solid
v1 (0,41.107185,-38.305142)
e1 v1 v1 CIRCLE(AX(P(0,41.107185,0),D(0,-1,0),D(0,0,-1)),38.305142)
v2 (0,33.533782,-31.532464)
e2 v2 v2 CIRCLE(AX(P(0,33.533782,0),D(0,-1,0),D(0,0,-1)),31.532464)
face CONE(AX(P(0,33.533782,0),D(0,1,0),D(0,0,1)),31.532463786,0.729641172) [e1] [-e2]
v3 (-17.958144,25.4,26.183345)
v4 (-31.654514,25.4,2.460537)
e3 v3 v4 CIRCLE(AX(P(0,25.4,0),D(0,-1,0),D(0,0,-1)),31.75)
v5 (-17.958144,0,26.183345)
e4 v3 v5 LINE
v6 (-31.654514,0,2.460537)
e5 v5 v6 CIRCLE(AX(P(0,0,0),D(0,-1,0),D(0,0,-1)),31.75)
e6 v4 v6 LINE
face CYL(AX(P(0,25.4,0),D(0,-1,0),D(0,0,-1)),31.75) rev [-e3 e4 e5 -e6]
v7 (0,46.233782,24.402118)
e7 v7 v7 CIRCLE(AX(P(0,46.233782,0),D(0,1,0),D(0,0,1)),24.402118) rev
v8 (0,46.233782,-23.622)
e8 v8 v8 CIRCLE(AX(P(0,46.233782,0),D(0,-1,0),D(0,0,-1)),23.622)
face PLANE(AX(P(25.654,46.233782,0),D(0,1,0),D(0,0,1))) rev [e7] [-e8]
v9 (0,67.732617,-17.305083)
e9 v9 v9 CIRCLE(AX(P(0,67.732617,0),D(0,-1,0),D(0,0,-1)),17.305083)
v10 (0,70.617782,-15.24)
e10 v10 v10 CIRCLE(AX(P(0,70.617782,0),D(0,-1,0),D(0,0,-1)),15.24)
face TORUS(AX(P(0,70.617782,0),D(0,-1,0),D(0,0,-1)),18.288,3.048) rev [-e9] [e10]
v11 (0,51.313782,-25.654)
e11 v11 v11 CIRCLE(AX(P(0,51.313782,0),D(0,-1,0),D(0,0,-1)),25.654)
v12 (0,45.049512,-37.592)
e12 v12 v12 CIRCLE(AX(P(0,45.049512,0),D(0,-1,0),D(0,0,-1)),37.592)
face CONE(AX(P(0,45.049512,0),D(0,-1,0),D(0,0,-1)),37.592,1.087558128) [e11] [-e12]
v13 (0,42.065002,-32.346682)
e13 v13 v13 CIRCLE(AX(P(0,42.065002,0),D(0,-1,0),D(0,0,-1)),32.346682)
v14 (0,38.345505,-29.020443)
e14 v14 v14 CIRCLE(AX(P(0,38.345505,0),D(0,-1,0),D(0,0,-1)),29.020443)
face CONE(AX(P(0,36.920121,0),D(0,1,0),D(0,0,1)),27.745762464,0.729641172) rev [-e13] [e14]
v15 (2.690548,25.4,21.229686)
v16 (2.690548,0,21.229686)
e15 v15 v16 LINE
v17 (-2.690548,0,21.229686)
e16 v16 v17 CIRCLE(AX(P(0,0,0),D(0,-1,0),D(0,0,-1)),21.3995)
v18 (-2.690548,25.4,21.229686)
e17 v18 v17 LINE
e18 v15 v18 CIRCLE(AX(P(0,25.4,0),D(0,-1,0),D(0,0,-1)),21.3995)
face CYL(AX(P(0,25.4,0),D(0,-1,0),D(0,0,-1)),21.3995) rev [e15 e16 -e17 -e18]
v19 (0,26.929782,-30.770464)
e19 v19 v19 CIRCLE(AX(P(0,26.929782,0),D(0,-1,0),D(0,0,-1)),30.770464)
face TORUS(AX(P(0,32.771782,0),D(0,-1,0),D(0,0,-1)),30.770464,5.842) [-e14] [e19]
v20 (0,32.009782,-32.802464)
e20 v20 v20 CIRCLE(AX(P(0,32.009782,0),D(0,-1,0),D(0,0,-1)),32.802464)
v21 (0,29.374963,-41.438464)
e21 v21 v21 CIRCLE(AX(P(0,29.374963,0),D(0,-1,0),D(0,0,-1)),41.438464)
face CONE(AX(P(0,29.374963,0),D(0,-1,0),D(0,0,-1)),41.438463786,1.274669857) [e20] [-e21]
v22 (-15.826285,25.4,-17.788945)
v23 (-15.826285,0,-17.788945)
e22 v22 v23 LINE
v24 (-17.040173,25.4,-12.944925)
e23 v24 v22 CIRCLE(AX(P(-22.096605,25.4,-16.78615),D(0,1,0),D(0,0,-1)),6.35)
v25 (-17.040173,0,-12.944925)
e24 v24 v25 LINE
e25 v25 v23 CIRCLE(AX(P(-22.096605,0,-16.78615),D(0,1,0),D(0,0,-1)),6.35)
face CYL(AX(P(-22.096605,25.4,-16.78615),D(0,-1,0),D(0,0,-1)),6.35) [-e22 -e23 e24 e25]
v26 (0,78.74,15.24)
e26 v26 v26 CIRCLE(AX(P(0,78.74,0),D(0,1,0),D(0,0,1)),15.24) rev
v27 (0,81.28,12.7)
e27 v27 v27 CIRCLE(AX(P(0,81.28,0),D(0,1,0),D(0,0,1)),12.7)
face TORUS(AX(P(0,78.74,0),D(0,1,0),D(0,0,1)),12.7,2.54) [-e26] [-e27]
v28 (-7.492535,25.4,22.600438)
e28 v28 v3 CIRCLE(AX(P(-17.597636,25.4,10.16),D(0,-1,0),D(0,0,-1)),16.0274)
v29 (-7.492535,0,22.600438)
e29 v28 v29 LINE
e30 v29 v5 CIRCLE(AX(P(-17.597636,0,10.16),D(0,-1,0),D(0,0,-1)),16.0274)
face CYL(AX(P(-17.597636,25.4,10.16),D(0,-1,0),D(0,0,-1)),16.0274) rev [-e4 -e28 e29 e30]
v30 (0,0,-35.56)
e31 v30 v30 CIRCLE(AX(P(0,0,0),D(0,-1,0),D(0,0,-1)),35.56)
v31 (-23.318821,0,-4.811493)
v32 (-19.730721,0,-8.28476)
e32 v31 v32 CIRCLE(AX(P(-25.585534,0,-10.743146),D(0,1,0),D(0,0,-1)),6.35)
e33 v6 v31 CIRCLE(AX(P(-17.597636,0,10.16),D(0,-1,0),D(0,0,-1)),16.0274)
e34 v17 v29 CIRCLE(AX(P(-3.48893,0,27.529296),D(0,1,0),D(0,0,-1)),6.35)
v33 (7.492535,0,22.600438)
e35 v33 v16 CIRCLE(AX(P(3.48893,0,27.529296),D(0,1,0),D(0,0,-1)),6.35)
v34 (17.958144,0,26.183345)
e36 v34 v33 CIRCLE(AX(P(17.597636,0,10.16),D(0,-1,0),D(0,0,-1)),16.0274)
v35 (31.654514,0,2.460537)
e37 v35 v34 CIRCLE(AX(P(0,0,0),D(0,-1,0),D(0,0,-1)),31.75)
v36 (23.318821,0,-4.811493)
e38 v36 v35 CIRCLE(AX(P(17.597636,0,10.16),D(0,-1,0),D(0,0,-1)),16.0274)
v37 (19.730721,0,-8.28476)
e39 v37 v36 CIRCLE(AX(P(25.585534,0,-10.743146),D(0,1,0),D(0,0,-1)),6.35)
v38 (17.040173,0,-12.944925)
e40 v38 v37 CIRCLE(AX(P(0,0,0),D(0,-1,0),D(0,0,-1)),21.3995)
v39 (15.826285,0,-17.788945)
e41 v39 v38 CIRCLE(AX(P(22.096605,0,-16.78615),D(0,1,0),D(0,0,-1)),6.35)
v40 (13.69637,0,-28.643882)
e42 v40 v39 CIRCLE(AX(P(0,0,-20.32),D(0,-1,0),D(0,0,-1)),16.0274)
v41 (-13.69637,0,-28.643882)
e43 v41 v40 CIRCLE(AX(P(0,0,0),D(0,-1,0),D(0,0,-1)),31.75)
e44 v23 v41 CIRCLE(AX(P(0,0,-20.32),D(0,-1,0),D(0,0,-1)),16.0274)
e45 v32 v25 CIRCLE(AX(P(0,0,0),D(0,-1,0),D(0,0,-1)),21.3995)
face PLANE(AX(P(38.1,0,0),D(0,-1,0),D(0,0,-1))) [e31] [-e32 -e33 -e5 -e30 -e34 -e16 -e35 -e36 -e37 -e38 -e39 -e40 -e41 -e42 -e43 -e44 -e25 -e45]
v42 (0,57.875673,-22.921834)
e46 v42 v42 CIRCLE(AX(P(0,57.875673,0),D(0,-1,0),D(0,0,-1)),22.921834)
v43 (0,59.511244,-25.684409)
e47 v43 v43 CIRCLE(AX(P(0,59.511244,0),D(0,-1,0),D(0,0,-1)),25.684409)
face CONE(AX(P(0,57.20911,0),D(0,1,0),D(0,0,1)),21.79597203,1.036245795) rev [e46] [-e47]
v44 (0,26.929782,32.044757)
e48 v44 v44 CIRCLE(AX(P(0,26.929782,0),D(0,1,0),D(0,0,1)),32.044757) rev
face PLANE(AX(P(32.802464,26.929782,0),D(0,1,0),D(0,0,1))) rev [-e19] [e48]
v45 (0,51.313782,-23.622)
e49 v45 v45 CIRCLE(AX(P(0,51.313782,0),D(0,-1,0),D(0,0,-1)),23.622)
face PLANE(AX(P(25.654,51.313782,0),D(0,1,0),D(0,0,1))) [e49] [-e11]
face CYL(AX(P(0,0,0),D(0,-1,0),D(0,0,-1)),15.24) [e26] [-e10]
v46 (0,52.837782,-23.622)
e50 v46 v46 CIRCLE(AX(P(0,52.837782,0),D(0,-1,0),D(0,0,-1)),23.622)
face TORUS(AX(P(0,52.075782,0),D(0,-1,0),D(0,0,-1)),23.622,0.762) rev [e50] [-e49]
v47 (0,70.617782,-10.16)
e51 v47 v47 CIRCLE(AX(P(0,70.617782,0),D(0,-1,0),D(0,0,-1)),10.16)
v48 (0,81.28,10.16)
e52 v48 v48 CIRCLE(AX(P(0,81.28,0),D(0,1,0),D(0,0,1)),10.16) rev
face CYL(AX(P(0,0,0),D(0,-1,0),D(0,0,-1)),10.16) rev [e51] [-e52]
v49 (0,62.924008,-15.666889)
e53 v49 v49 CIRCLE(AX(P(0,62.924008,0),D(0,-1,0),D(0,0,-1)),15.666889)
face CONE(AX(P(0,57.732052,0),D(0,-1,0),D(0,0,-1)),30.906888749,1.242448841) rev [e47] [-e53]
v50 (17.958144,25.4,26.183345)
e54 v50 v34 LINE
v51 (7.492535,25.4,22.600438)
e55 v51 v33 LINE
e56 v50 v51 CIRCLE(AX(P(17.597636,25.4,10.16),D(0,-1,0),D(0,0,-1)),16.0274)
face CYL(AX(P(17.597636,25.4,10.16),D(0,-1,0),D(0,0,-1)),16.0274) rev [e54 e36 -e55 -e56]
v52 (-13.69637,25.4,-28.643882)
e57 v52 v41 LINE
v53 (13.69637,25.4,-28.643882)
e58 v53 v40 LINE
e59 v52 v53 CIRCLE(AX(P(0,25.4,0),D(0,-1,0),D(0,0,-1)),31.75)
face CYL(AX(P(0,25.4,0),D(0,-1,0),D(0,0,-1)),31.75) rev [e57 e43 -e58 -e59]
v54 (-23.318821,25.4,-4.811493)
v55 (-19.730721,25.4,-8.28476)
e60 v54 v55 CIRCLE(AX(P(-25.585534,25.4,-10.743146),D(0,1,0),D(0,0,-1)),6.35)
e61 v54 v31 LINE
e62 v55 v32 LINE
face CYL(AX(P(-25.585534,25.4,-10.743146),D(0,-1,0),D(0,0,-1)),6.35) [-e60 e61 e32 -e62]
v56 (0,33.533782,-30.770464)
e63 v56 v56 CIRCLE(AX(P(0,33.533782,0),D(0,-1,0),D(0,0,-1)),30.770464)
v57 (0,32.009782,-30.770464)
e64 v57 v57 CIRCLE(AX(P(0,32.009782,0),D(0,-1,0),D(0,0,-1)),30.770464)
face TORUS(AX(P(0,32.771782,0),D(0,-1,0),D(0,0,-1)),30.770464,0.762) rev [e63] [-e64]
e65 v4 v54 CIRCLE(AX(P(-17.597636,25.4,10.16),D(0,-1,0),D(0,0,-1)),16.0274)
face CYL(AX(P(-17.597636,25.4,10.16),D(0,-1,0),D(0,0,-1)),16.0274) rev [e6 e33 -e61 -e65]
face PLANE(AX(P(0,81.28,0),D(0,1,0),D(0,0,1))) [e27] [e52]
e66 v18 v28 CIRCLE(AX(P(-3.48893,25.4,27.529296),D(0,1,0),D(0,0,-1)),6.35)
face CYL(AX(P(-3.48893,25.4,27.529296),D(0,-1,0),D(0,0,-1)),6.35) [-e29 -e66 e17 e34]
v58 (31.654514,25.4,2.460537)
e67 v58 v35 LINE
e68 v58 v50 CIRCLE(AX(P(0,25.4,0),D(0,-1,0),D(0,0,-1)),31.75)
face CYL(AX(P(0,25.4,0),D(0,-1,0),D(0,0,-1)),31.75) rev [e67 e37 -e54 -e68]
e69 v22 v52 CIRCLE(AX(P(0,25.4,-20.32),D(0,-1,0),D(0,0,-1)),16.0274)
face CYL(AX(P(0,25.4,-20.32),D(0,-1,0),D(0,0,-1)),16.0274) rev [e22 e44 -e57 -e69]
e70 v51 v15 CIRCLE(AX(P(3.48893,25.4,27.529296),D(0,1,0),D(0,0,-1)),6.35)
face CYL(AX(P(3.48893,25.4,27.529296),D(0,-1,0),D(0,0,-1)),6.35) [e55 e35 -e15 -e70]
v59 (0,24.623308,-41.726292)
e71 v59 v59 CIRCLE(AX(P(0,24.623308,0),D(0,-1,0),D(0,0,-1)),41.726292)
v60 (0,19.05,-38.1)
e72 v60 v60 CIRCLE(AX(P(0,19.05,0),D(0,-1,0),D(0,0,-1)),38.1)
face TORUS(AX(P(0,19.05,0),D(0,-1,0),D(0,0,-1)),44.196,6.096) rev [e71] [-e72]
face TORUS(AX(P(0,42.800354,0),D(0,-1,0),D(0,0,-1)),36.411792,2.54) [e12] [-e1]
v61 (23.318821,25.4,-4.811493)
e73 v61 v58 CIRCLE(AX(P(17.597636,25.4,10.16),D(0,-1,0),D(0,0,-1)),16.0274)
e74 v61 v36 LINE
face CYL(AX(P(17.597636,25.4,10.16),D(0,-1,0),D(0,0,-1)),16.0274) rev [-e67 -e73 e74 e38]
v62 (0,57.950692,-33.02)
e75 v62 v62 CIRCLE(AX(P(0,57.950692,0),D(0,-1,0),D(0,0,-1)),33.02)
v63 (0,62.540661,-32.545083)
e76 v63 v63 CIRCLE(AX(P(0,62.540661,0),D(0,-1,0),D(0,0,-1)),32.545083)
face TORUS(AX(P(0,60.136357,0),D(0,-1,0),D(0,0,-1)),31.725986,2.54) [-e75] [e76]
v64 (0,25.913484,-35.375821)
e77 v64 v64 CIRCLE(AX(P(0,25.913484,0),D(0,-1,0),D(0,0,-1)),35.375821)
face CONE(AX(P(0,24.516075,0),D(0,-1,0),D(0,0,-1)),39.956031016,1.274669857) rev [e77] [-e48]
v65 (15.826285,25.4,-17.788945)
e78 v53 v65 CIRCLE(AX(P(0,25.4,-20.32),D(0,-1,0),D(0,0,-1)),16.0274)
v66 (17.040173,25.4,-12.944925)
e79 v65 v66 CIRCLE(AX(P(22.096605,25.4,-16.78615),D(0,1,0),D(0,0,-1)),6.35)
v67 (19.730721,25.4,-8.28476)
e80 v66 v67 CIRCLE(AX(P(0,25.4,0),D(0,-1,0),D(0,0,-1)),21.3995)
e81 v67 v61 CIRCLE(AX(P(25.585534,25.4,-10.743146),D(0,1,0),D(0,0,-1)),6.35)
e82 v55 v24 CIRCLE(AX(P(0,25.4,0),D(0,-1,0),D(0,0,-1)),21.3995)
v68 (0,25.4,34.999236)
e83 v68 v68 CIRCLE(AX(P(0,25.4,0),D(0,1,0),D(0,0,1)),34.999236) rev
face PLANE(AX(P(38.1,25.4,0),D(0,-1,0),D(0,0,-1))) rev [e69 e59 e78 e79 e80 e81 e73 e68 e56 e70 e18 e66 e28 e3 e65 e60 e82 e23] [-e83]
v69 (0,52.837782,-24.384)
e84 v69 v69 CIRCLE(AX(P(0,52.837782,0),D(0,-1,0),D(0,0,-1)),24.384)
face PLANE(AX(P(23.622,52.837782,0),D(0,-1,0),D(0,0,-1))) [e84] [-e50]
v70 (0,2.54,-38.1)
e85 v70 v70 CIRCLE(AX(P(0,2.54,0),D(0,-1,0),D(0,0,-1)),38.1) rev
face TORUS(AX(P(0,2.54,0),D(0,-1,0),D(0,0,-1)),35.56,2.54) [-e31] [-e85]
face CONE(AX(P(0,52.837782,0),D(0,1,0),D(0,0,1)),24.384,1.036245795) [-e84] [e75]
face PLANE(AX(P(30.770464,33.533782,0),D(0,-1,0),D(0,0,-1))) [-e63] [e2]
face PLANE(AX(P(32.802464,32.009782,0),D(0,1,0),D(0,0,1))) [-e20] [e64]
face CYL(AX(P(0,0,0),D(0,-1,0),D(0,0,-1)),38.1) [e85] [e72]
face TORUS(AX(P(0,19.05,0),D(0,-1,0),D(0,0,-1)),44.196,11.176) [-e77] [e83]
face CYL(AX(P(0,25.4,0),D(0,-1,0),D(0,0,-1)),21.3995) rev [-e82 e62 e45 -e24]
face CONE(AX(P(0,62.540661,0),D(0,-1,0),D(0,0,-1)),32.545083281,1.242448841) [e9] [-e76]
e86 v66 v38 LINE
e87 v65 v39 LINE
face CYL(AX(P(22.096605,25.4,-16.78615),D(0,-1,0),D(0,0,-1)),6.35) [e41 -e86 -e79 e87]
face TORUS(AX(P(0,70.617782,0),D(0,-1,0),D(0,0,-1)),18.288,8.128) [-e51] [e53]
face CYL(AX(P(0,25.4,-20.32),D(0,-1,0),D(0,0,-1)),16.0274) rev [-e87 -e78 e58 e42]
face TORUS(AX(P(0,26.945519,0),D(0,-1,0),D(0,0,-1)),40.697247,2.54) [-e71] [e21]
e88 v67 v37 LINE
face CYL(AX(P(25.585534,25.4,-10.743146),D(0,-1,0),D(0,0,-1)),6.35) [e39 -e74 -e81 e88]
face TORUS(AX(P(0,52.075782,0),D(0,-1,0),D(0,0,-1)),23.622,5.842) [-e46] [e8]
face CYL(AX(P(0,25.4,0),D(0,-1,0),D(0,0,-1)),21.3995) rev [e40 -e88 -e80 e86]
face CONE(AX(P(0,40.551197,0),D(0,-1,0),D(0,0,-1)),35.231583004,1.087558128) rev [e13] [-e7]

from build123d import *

# Parameters (mm, degrees)
CUT_EXTRUDE6_DEPTH = 25.4
FILLET2_R          = 2.54


# Read off the part's stored shape, not the designer's step: Shell5
with BuildPart() as part:
    # Sketch1 → Revolve1 (revolve)
    with BuildSketch(Plane.XY, mode=Mode.PRIVATE) as revolve1_sk:
        with BuildLine():
            Line((0, 0), (0, 81.28))
            Line((0, 81.28), (15.24, 81.28))
            Line((15.24, 81.28), (15.24, 70.617782167))
            ThreePointArc((15.24, 70.617782167), (15.809468766, 68.843750905), (17.305083281, 67.732616882))
            Line((17.305083281, 67.732616882), (32.545083281, 62.540661026))
            ThreePointArc((32.545083281, 62.540661026), (34.252497966, 60.397770779), (33.02, 57.950692464))
            Line((33.02, 57.950692464), (24.384, 52.837782167))
            Line((24.384, 52.837782167), (23.622, 52.837782167))
            ThreePointArc((23.622, 52.837782167), (22.86, 52.075782167), (23.622, 51.313782167))
            Line((23.622, 51.313782167), (25.654, 51.313782167))
            Line((25.654, 51.313782167), (37.592, 45.049511558))
            ThreePointArc((37.592, 45.049511558), (38.911226743, 43.252486551), (38.305142163, 41.107184811))
            Line((38.305142163, 41.107184811), (31.532463786, 33.533782167))
            Line((31.532463786, 33.533782167), (30.770463786, 33.533782167))
            ThreePointArc((30.770463786, 33.533782167), (30.008463786, 32.771782167), (30.770463786, 32.009782167))
            Line((30.770463786, 32.009782167), (32.802463786, 32.009782167))
            Line((32.802463786, 32.009782167), (41.438463786, 29.374963403))
            ThreePointArc((41.438463786, 29.374963403), (43.232600234, 27.099096753), (41.726292283, 24.623307796))
            ThreePointArc((41.726292283, 24.623307796), (39.086374072, 22.374596047), (38.1, 19.05))
            Line((38.1, 19.05), (38.1, 0))
            Line((38.1, 0), (0, 0))
        make_face()
    revolve(revolve1_sk.sketch.rotate(Axis((0, 0, 0), (0, 1, 0)), 90), axis=Axis((0, 0, 0), (0, 1, 0)))

    # Shell5 outline → Shell5 (revolve, cut)
    with BuildSketch(Plane.XY):
        with BuildLine():
            Line((0, 81.28), (0, 25.4))
            Line((0, 25.4), (34.999235569, 25.4))
            ThreePointArc((34.999235569, 25.4), (35.18387039, 25.659424777), (35.375820896, 25.913484288))
            Line((35.375820896, 25.913484288), (32.044757447, 26.929782167))
            Line((32.044757447, 26.929782167), (30.770463786, 26.929782167))
            ThreePointArc((30.770463786, 26.929782167), (24.995922457, 31.886549747), (29.020442836, 38.345505399))
            Line((29.020442836, 38.345505399), (32.346682487, 42.065001701))
            Line((32.346682487, 42.065001701), (24.402118097, 46.233782167))
            Line((24.402118097, 46.233782167), (23.622, 46.233782167))
            ThreePointArc((23.622, 46.233782167), (17.790536831, 51.725066739), (22.921834268, 57.875672851))
            Line((22.921834268, 57.875672851), (25.684408568, 59.511244248))
            Line((25.684408568, 59.511244248), (15.666888749, 62.924008073))
            ThreePointArc((15.666888749, 62.924008073), (11.678583375, 65.887032134), (10.16, 70.617782167))
            Line((10.16, 70.617782167), (10.16, 81.28))
            Line((10.16, 81.28), (0, 81.28))
        make_face()
    revolve(axis=Axis((0, 0, 0), (0, 1, 0)), mode=Mode.SUBTRACT)

    # Sketch4 → Cut-Extrude6 (cut)
    with BuildSketch(Plane.XZ):
        with BuildLine():
            ThreePointArc((-15.826285431, -17.788944827), (-15.766556105, -17.289127555), (-15.746604539, -16.786149592))
            ThreePointArc((-15.746604539, -16.786149592), (-16.078679713, -14.759556194), (-17.040173294, -12.944925429))
            ThreePointArc((-17.040173294, -12.944925429), (-18.532510629, -10.699749999), (-19.730720919, -8.284760242))
            ThreePointArc((-19.730720919, -8.284760242), (-21.169008942, -6.180602458), (-23.318820842, -4.811492816))
            ThreePointArc((-23.318820842, -4.811492816), (-28.133932609, -1.917417309), (-31.654514046, 2.460536633))
            ThreePointArc((-31.654514046, 2.460536633), (-27.496306571, 15.874999999), (-17.958144256, 26.18334499))
            ThreePointArc((-17.958144256, 26.18334499), (-12.406434208, 25.323409001), (-7.492535415, 22.600437643))
            ThreePointArc((-7.492535415, 22.600437643), (-5.231945734, 21.423200745), (-2.690547628, 21.229685672))
            ThreePointArc((-2.690547628, 21.229685672), (-2e-09, 21.3995), (2.690547624, 21.229685672))
            ThreePointArc((2.690547624, 21.229685672), (5.23194573, 21.423200746), (7.492535411, 22.600437644))
            ThreePointArc((7.492535411, 22.600437644), (12.406434204, 25.323409003), (17.958144252, 26.183344993))
            ThreePointArc((17.958144252, 26.183344993), (27.496306569, 15.875000003), (31.654514046, 2.460536637))
            ThreePointArc((31.654514046, 2.460536637), (28.13393261, -1.917417305), (23.318820843, -4.811492812))
            ThreePointArc((23.318820843, -4.811492812), (21.169008943, -6.180602455), (19.73072092, -8.284760239))
            ThreePointArc((19.73072092, -8.284760239), (18.532510628, -10.69975), (17.040173292, -12.944925432))
            ThreePointArc((17.040173292, -12.944925432), (15.937063208, -15.24259829), (15.826285427, -17.78894483))
            ThreePointArc((15.826285427, -17.78894483), (15.977042244, -19.050483621), (16.027399998, -20.32))
            ThreePointArc((16.027399998, -20.32), (15.43364422, -24.642057009), (13.696369788, -28.643881626))
            ThreePointArc((13.696369788, -28.643881626), (-3e-09, -31.75), (-13.696369794, -28.643881624))
            ThreePointArc((-13.696369794, -28.643881624), (-15.727498405, -23.405991693), (-15.826285431, -17.788944827))
        make_face()
    extrude(amount=-CUT_EXTRUDE6_DEPTH, mode=Mode.SUBTRACT)

    # Fillet2
    fillet2_edges = [part.edges().sort_by_distance(p)[0] for p in [
        (0, 0, 38.1),
        (0, 81.28, 15.24),
    ]]
    fillet(fillet2_edges, radius=FILLET2_R)


solid = part.part
